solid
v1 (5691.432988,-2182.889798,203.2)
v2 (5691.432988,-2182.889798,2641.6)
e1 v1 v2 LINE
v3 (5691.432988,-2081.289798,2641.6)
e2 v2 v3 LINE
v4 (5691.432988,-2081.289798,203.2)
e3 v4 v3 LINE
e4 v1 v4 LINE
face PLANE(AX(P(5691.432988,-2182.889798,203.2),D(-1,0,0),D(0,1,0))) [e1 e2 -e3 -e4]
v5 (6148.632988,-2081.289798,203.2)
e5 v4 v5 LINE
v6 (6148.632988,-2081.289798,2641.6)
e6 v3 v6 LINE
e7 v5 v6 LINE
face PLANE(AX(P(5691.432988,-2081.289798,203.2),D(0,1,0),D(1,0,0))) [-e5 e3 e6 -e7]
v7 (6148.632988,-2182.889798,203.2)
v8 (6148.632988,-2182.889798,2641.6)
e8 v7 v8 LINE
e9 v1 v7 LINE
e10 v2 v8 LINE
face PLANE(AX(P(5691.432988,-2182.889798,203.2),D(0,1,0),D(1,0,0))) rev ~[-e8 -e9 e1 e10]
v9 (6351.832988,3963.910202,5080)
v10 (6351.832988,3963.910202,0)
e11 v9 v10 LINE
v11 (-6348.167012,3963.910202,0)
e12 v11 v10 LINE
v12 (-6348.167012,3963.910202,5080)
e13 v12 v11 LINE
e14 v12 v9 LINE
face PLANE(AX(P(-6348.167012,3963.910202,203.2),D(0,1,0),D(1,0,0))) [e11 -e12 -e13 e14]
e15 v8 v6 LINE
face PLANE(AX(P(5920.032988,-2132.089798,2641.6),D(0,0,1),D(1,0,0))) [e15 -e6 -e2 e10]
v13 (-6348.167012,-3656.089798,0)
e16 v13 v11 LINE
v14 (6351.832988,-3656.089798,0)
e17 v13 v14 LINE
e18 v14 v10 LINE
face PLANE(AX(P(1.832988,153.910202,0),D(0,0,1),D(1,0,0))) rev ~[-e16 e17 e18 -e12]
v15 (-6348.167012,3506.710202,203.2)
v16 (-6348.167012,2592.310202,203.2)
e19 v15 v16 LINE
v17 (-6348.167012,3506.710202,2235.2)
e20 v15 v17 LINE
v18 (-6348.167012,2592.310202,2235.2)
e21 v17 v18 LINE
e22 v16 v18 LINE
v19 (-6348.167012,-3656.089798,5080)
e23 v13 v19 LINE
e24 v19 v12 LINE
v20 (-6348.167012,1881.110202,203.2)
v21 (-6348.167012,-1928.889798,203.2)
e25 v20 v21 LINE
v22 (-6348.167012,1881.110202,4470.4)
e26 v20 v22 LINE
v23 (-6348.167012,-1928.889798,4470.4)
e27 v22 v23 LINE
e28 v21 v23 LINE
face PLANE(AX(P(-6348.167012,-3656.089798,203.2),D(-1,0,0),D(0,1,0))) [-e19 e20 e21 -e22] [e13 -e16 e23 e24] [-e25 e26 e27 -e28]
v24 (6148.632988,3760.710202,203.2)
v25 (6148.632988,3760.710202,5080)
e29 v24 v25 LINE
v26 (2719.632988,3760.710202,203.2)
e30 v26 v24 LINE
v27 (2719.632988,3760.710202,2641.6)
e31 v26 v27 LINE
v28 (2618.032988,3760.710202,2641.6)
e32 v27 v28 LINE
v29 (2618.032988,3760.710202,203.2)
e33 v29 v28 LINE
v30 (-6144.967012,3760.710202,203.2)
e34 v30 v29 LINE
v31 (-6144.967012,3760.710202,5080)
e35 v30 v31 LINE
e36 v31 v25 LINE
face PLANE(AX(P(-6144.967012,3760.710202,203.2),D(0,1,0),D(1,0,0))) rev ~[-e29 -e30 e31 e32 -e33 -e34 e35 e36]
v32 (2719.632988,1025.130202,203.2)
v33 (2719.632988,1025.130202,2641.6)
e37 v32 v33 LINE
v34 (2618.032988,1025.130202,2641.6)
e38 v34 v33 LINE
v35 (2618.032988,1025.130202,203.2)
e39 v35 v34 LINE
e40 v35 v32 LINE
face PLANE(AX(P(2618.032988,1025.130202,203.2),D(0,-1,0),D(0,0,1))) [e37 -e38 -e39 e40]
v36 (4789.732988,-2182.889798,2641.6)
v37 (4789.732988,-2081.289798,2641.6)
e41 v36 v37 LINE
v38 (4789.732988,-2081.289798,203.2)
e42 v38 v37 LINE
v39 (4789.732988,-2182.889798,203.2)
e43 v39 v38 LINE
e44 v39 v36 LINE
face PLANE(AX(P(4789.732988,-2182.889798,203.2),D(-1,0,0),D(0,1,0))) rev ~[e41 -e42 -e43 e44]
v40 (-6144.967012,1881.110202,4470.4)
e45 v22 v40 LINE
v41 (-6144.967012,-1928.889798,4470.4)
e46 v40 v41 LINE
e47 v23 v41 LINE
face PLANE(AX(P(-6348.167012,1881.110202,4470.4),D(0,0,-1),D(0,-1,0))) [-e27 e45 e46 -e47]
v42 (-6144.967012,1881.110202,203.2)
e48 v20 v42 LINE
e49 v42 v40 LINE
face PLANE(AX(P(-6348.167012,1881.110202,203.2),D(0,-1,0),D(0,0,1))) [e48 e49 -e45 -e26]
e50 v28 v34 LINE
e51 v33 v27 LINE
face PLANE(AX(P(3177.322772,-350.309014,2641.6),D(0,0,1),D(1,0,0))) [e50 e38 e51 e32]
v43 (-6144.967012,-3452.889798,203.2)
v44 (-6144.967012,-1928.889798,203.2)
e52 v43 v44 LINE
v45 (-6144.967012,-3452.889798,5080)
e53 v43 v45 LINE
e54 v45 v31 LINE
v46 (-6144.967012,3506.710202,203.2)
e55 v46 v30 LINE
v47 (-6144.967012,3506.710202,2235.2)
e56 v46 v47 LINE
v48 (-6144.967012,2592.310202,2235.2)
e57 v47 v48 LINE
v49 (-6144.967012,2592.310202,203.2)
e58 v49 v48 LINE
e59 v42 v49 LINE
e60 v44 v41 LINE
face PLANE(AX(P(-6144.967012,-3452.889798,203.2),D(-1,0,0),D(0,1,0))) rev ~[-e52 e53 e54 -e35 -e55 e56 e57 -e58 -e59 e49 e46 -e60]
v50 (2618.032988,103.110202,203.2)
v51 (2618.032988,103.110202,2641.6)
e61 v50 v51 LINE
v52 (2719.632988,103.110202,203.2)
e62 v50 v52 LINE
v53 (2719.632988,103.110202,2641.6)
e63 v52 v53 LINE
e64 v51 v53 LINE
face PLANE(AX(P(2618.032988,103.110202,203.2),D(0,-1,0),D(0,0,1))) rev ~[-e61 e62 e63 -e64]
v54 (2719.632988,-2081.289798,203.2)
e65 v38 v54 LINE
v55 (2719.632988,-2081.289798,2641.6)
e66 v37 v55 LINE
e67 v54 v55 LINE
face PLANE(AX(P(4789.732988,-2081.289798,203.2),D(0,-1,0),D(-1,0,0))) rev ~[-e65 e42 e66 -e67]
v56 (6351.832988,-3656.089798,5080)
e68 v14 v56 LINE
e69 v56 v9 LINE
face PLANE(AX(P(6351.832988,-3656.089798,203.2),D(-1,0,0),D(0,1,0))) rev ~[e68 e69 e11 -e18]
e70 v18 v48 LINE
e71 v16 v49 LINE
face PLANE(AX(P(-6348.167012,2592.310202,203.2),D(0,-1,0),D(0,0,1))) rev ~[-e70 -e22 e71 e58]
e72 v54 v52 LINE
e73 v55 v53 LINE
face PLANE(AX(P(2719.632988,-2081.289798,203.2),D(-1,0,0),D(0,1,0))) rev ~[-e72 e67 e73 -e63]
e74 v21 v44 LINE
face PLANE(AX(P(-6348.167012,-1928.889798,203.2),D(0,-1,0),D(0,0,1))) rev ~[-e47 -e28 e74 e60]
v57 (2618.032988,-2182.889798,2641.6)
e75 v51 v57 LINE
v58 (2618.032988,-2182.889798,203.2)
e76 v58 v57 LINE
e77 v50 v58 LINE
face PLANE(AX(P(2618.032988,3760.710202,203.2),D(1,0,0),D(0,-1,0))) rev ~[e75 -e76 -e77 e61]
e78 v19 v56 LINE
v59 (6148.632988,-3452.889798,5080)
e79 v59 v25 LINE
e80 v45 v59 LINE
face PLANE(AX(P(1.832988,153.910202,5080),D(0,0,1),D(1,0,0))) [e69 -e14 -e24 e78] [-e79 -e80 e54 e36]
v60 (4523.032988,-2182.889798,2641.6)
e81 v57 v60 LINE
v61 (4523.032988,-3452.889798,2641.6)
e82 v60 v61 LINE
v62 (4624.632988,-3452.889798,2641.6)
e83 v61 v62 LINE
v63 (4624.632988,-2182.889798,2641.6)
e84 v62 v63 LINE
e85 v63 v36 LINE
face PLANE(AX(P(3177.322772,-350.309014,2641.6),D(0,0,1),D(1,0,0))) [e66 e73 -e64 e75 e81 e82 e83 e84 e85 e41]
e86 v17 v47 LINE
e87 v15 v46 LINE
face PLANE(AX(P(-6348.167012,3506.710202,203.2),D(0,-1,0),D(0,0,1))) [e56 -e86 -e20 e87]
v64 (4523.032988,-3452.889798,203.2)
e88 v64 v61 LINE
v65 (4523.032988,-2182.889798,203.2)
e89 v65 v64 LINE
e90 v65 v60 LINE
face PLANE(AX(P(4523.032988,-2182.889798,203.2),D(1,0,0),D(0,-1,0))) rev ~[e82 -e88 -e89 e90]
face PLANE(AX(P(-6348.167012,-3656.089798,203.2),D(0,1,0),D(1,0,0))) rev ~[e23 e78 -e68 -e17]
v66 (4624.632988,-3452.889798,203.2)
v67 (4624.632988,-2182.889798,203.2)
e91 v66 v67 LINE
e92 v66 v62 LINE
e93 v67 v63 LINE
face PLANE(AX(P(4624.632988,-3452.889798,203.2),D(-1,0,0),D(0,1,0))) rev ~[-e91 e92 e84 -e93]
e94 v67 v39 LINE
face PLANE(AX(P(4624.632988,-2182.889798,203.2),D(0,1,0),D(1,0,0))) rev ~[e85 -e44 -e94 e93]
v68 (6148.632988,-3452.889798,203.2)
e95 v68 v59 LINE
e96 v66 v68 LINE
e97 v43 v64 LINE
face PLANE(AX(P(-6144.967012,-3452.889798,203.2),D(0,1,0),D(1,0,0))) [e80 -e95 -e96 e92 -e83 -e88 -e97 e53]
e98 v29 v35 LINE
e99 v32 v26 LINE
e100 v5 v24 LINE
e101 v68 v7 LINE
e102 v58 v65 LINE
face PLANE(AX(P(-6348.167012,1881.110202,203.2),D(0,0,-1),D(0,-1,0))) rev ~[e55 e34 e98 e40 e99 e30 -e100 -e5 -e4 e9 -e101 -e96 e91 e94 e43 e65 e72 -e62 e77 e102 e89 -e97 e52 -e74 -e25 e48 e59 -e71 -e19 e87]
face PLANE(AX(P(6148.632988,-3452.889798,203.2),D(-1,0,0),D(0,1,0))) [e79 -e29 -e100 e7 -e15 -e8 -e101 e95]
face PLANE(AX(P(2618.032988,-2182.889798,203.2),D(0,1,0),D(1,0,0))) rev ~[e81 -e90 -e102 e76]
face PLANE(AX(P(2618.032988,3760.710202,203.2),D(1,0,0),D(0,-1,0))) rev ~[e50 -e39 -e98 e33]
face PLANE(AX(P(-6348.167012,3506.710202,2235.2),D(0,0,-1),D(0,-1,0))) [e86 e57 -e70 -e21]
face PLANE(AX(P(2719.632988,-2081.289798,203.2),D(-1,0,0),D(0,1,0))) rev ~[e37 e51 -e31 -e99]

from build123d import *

# Parameters (mm, degrees)
F3_W      = 12700
F3_H      = 7620
F4_DEPTH  = 203.2
F5_W      = 12700
F5_H      = 7620
F5_W_2    = 12293.6
F5_H_2    = 7213.6
F6_DEPTH  = 4876.8
F7_W      = 3810
F7_H      = 4267.2
F7_W_2    = 914.4
F7_H_2    = 2032
F8_DEPTH  = 203.2
F9_W      = 457.2
F9_H      = 101.6
F10_DEPTH = 2438.4
F11_W     = 922.02
F11_H     = 2438.4
F12_DEPTH = 101.6


# Not quite as in the source:
# - a variable given as a bare number and used for a length is read in inches; the dataset says mm whatever the document's units were


with BuildPart() as f4:
    # F3 (on Top) → F4 (new body)
    with BuildSketch(Plane.XY):
        with Locations((1.8329881132, 153.9102016476)):
            Rectangle(F3_W, F3_H)
    extrude(amount=F4_DEPTH)

    # F5 (on face) → F6 (join)
    with BuildSketch(Plane.XY.offset(203.2)):
        with Locations((1.8329881132, 153.9102016476)):
            Rectangle(F5_W, F5_H)
        with Locations((1.8329881132, 153.9102016476)):
            Rectangle(F5_W_2, F5_H_2, mode=Mode.SUBTRACT)
    extrude(amount=F6_DEPTH)

    # F7 (on face) → F8 (cut, through all)
    with BuildSketch(Plane(origin=(-6348.1670118868, 0, 0), x_dir=(0, -1, 0), z_dir=(-1, 0, 0))):
        with Locations((23.8897983524, 2336.8)):
            Rectangle(F7_W, F7_H)
        with Locations((-3049.5102016476, 1219.2)):
            Rectangle(F7_W_2, F7_H_2)
    extrude(amount=-F8_DEPTH, mode=Mode.SUBTRACT)

    # F9 (on face) → F10 (join)
    with BuildSketch(Plane.XY.offset(203.2)):
        Polygon((2719.6329881132, -2081.2897983524), (2719.6329881132, 3760.7102016476), (2618.0329881132, 3760.7102016476), (2618.0329881132, -2182.8897983524), (4523.0329881132, -2182.8897983524), (4523.0329881132, -3452.8897983524), (4624.6329881132, -3452.8897983524), (4624.6329881132, -2182.8897983524), (4789.7329881132, -2182.8897983524), (4789.7329881132, -2081.2897983524), (4624.6329881132, -2081.2897983524), align=None)
        with Locations((5920.0329881132, -2132.0897983524)):
            Rectangle(F9_W, F9_H)
    extrude(amount=F10_DEPTH)

    # F11 (on face) → F12 (cut, through all)
    with BuildSketch(Plane(origin=(2618.0329881132, 0, 0), x_dir=(0, -1, 0), z_dir=(-1, 0, 0))):
        with Locations((-564.1202016476, 1422.4)):
            Rectangle(F11_W, F11_H)
    extrude(amount=-F12_DEPTH, mode=Mode.SUBTRACT)


solid = f4.part
